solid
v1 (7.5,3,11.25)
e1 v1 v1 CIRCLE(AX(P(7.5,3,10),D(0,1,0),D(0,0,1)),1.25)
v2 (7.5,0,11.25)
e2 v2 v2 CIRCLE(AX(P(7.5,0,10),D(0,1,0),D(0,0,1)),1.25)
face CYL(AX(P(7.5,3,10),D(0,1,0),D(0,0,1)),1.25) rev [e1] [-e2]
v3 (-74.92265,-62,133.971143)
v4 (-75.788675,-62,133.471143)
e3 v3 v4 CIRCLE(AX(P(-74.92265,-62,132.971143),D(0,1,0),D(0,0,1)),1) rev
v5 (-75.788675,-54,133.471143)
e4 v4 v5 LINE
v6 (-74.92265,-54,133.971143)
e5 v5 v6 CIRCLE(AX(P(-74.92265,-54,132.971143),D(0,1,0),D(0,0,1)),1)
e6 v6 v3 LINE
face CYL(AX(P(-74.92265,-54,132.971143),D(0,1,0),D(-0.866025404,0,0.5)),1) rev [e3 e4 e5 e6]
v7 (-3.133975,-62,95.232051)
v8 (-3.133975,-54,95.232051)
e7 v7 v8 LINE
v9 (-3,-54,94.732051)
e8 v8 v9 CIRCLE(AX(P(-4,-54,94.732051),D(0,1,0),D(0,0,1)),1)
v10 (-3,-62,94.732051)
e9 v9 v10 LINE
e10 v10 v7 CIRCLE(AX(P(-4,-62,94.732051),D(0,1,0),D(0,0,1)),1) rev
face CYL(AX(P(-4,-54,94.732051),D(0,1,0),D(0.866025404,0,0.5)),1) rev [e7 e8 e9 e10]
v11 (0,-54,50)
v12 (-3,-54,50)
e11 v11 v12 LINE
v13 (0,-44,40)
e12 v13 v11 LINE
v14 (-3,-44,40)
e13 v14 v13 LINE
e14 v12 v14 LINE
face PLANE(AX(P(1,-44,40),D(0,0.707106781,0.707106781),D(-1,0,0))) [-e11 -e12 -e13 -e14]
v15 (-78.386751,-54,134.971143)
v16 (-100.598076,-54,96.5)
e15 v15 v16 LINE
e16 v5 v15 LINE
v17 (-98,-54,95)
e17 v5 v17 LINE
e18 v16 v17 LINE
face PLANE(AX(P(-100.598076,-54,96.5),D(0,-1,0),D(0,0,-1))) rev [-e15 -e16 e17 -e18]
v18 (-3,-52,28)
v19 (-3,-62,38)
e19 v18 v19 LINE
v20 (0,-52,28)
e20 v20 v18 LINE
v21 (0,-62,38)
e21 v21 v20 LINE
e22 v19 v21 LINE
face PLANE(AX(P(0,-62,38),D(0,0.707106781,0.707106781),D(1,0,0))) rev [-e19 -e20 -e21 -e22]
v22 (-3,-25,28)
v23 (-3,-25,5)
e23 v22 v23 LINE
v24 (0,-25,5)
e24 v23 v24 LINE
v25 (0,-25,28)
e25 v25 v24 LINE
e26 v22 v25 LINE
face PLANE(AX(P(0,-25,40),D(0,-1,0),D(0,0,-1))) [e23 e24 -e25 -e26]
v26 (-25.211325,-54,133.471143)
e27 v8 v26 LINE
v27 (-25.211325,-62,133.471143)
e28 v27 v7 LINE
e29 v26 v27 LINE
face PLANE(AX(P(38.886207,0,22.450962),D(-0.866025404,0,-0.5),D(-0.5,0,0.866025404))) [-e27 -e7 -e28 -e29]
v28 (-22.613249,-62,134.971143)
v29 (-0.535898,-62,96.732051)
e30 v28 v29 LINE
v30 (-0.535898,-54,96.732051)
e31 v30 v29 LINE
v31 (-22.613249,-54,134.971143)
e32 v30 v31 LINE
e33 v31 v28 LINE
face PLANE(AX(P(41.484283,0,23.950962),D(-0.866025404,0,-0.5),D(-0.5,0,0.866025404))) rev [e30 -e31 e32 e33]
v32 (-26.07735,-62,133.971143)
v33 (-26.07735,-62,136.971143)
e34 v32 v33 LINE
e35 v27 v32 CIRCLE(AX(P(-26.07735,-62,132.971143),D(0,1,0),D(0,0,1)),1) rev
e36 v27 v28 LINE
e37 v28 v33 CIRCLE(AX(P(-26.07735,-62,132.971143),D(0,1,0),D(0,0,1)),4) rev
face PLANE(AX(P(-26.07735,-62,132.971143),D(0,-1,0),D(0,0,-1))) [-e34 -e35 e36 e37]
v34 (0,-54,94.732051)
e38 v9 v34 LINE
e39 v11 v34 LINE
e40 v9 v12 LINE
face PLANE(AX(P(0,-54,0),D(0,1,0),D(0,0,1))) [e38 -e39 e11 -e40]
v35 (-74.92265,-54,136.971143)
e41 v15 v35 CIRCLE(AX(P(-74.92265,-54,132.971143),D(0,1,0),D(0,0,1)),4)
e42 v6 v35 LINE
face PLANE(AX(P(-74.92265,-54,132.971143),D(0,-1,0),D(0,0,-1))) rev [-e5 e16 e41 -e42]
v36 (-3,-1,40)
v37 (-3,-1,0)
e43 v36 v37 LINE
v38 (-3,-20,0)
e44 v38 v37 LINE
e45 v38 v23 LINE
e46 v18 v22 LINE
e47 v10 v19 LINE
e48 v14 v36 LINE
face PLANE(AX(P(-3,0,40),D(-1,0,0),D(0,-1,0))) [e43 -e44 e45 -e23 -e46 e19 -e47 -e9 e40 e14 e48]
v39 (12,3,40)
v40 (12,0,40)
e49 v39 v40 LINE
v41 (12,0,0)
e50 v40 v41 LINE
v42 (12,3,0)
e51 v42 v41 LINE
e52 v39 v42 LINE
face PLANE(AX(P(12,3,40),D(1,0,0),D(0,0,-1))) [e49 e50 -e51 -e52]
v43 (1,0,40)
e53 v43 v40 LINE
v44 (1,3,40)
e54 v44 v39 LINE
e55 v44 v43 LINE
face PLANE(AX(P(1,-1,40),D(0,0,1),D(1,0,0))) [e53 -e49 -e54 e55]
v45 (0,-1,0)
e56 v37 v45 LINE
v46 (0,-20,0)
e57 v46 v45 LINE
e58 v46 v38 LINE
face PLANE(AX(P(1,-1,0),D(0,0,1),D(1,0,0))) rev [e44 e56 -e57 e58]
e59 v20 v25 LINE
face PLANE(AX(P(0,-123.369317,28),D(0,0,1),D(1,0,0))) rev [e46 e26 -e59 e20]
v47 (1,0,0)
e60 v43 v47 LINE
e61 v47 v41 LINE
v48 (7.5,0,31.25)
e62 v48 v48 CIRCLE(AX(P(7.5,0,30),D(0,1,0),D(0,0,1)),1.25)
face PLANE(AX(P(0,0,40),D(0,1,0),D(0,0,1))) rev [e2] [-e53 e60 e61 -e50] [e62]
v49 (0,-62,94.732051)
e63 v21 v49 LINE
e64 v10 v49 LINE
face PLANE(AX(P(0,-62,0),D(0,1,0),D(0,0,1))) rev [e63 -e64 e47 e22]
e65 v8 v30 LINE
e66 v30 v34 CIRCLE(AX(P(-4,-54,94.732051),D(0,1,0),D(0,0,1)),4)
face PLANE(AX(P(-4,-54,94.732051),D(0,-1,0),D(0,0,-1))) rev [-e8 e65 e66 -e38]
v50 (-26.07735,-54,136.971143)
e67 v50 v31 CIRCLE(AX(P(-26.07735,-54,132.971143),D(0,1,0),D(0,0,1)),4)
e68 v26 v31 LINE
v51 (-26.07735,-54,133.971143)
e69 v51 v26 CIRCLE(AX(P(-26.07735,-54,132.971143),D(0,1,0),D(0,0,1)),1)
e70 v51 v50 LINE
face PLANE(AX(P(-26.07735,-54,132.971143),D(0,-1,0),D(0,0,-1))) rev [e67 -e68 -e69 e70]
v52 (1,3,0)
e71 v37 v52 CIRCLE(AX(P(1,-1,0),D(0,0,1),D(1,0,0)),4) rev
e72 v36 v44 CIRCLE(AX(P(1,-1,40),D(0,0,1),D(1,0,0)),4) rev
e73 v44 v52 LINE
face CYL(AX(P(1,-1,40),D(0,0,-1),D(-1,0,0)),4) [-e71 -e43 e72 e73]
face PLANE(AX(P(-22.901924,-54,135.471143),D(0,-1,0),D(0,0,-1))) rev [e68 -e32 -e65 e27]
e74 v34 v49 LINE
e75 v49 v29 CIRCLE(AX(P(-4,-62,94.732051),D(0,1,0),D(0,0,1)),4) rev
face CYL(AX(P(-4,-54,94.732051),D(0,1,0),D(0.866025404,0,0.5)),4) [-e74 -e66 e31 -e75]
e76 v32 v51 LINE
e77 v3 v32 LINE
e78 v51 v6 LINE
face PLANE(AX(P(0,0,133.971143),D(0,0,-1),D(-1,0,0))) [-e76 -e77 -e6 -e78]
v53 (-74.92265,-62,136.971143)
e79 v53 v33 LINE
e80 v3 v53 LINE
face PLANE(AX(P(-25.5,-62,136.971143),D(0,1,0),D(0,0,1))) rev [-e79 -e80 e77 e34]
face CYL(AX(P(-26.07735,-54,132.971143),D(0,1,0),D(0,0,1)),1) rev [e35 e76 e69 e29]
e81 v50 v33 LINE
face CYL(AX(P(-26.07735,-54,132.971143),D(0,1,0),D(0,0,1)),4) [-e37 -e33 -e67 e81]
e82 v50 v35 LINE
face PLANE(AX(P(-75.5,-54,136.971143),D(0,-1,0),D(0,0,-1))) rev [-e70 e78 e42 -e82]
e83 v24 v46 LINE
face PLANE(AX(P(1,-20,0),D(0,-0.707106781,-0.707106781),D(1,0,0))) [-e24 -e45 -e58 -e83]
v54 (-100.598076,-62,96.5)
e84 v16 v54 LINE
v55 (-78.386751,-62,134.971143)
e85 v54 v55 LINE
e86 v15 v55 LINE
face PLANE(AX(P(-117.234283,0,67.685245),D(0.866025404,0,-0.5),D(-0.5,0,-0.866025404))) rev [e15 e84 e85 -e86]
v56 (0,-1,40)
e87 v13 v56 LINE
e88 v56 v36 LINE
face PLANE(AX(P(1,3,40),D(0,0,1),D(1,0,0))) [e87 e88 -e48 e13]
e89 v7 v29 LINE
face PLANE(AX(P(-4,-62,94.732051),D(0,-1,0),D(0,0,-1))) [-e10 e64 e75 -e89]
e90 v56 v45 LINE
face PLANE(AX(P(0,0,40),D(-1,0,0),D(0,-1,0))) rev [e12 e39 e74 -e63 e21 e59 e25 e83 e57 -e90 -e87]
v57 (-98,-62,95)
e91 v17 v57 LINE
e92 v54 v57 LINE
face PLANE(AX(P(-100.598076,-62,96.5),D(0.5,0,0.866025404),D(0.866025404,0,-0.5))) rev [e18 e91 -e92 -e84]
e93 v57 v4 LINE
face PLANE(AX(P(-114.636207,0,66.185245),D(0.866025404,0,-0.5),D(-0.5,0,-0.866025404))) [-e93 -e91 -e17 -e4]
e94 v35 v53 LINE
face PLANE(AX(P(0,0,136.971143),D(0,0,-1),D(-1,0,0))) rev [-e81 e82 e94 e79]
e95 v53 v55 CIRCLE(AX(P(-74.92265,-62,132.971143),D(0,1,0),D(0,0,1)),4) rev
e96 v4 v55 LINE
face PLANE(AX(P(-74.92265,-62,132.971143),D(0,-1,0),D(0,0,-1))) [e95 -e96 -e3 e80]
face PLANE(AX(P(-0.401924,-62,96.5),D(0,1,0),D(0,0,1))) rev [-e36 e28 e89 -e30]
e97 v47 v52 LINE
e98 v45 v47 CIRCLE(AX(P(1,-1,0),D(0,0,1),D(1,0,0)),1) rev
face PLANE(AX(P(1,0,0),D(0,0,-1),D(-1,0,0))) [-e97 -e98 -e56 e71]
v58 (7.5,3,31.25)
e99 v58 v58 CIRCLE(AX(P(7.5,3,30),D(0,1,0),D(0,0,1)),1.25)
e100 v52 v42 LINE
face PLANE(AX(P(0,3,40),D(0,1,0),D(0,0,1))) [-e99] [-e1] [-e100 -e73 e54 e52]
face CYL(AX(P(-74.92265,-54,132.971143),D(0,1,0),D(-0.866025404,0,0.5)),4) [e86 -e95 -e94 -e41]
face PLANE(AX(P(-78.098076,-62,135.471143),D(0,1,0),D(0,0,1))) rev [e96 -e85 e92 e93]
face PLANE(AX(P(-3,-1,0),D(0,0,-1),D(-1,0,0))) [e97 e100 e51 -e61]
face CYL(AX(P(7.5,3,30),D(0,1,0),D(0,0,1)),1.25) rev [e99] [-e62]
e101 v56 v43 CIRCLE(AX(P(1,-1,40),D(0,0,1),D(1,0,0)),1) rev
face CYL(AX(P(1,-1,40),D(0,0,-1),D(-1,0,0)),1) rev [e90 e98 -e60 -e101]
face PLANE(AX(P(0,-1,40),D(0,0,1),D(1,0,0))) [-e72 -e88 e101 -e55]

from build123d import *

# Parameters (mm, degrees)
SM_BASE_FLANGE_1_DEPTH           = 40
M3X0_5_1_D                       = 2.5
SKETCH_22_W                      = 3
SKETCH_22_H                      = 12
EXTRUDE_6_DEPTH                  = 29
SKETCH_23_W                      = 3
SKETCH_23_H                      = 67
EXTRUDE_7_DEPTH                  = 8
CHAMFER_1_SIZE                   = 10
CHAMFER_2_SIZE                   = 5
SM_EDGE_FLANGE_1_STRIP_CUT_DEPTH = 8
SM_EDGE_FLANGE_1_DEPTH           = 8
SM_EDGE_FLANGE_2_STRIP_CUT_DEPTH = 8
SM_EDGE_FLANGE_2_DEPTH           = 8
SM_EDGE_FLANGE_3_STRIP_CUT_DEPTH = 8
SM_EDGE_FLANGE_3_DEPTH           = 8


# Sheet-metal steps are written as plain solids
with BuildPart() as part:
    # 草圖3 → 基材-凸緣1 (new body)
    with BuildSketch(Plane.XY):
        with BuildLine():
            Line((12, 0), (1, 0))
            ThreePointArc((1, 0), (0.292893219, -0.292893219), (0, -1))
            Line((0, -1), (0, -25))
            Line((0, -25), (-3, -25))
            Line((-3, -25), (-3, -1))
            ThreePointArc((-3, -1), (-1.828427125, 1.828427125), (1, 3))
            Line((1, 3), (12, 3))
            Line((12, 3), (12, 0))
        make_face()
    extrude(amount=SM_BASE_FLANGE_1_DEPTH)

    # M3x0.5 螺紋孔1 (through all)
    with Locations(Plane(origin=(0, 3, 0), x_dir=(1, 0, 0), z_dir=(0, 1, 0))):
        with Locations((7.5, -30), (7.5, -10)):
            Hole(M3X0_5_1_D / 2)

    # 草圖22 → 填料-伸長6 (add)
    with BuildSketch(Plane.XZ.offset(25)):
        with Locations((-1.5, 34)):
            Rectangle(SKETCH_22_W, SKETCH_22_H)
    extrude(amount=EXTRUDE_6_DEPTH)

    # 草圖23 → 填料-伸長7 (add)
    with BuildSketch(Plane.XZ.offset(54)):
        with Locations((-1.5, 61.5)):
            Rectangle(SKETCH_23_W, SKETCH_23_H)
    extrude(amount=EXTRUDE_7_DEPTH)

    # 導角1
    chamfer_1_edges = [part.edges().sort_by_distance(p)[0] for p in [
        (-1.5, -54, 40),
        (-1.5, -62, 28),
    ]]
    chamfer(chamfer_1_edges, length=CHAMFER_1_SIZE)

    # 導角2
    chamfer_2_edges = [part.edges().sort_by_distance(p)[0] for p in [
        (-1.5, -25, 0),
    ]]
    chamfer(chamfer_2_edges, length=CHAMFER_2_SIZE)

    # 邊線-凸緣1 strip (across the edge) → 邊線-凸緣1 strip cut (cut)
    with BuildSketch(Plane(origin=(-3, -62, 95), x_dir=(-0.8660254037844416, 0, -0.49999999999999495), z_dir=(0, 1, 0))):
        Polygon((-9.464101615, 10.392304845), (-2.464101615, -1.732050808), (0.133974596, -0.232050808), (-6.866025404, 11.892304845), align=None)
    extrude(amount=SM_EDGE_FLANGE_1_STRIP_CUT_DEPTH, mode=Mode.SUBTRACT)

    # 邊線-凸緣1 section (across the edge) → 邊線-凸緣1 (add)
    with BuildSketch(Plane(origin=(-3, -62, 95), x_dir=(-0.8660254037844416, 0, -0.49999999999999495), z_dir=(0, 1, 0))):
        with BuildLine():
            Line((-3, 0.267949192), (-3, 45))
            Line((-3, 45), (0, 45))
            Line((0, 45), (0, 0.267949192))
            ThreePointArc((0, 0.267949192), (0.034074174, 0.009130147), (0.133974596, -0.232050808))
            Line((0.133974596, -0.232050808), (-2.464101615, -1.732050808))
            ThreePointArc((-2.464101615, -1.732050808), (-2.863703305, -0.767326988), (-3, 0.267949192))
        make_face()
    extrude(amount=SM_EDGE_FLANGE_1_DEPTH)

    # 邊線-凸緣2 strip (across the edge) → 邊線-凸緣2 strip cut (cut)
    with BuildSketch(Plane(origin=(-25.5, -62, 133.97114317), x_dir=(0, 0, -1), z_dir=(0, 1, 0))):
        Polygon((-13.124355653, 4.113248654), (-1, -2.886751346), (0.5, -0.288675135), (-11.624355653, 6.711324865), align=None)
    extrude(amount=SM_EDGE_FLANGE_2_STRIP_CUT_DEPTH, mode=Mode.SUBTRACT)

    # 邊線-凸緣2 section (across the edge) → 邊線-凸緣2 (add)
    with BuildSketch(Plane(origin=(-25.5, -62, 133.97114317), x_dir=(0, 0, -1), z_dir=(0, 1, 0))):
        with BuildLine():
            Line((-3, 0.577350269), (-3, 50))
            Line((-3, 50), (0, 50))
            Line((0, 50), (0, 0.577350269))
            ThreePointArc((0, 0.577350269), (0.133974596, 0.077350269), (0.5, -0.288675135))
            Line((0.5, -0.288675135), (-1, -2.886751346))
            ThreePointArc((-1, -2.886751346), (-2.464101615, -1.422649731), (-3, 0.577350269))
        make_face()
    extrude(amount=SM_EDGE_FLANGE_2_DEPTH)

    # 邊線-凸緣3 strip (across the edge) → 邊線-凸緣3 strip cut (cut)
    with BuildSketch(Plane(origin=(-75.5, -62, 133.97114317), x_dir=(0.8660254037844312, 0, -0.5000000000000132), z_dir=(0, 1, 0))):
        Polygon((-13.124355653, 4.113248654), (-1, -2.886751346), (0.5, -0.288675135), (-11.624355653, 6.711324865), align=None)
    extrude(amount=SM_EDGE_FLANGE_3_STRIP_CUT_DEPTH, mode=Mode.SUBTRACT)

    # 邊線-凸緣3 section (across the edge) → 邊線-凸緣3 (add)
    with BuildSketch(Plane(origin=(-75.5, -62, 133.97114317), x_dir=(0.8660254037844312, 0, -0.5000000000000132), z_dir=(0, 1, 0))):
        with BuildLine():
            Line((-3, 0.577350269), (-3, 45))
            Line((-3, 45), (0, 45))
            Line((0, 45), (0, 0.577350269))
            ThreePointArc((0, 0.577350269), (0.133974596, 0.077350269), (0.5, -0.288675135))
            Line((0.5, -0.288675135), (-1, -2.886751346))
            ThreePointArc((-1, -2.886751346), (-2.464101615, -1.422649731), (-3, 0.577350269))
        make_face()
    extrude(amount=SM_EDGE_FLANGE_3_DEPTH)


solid = part.part
